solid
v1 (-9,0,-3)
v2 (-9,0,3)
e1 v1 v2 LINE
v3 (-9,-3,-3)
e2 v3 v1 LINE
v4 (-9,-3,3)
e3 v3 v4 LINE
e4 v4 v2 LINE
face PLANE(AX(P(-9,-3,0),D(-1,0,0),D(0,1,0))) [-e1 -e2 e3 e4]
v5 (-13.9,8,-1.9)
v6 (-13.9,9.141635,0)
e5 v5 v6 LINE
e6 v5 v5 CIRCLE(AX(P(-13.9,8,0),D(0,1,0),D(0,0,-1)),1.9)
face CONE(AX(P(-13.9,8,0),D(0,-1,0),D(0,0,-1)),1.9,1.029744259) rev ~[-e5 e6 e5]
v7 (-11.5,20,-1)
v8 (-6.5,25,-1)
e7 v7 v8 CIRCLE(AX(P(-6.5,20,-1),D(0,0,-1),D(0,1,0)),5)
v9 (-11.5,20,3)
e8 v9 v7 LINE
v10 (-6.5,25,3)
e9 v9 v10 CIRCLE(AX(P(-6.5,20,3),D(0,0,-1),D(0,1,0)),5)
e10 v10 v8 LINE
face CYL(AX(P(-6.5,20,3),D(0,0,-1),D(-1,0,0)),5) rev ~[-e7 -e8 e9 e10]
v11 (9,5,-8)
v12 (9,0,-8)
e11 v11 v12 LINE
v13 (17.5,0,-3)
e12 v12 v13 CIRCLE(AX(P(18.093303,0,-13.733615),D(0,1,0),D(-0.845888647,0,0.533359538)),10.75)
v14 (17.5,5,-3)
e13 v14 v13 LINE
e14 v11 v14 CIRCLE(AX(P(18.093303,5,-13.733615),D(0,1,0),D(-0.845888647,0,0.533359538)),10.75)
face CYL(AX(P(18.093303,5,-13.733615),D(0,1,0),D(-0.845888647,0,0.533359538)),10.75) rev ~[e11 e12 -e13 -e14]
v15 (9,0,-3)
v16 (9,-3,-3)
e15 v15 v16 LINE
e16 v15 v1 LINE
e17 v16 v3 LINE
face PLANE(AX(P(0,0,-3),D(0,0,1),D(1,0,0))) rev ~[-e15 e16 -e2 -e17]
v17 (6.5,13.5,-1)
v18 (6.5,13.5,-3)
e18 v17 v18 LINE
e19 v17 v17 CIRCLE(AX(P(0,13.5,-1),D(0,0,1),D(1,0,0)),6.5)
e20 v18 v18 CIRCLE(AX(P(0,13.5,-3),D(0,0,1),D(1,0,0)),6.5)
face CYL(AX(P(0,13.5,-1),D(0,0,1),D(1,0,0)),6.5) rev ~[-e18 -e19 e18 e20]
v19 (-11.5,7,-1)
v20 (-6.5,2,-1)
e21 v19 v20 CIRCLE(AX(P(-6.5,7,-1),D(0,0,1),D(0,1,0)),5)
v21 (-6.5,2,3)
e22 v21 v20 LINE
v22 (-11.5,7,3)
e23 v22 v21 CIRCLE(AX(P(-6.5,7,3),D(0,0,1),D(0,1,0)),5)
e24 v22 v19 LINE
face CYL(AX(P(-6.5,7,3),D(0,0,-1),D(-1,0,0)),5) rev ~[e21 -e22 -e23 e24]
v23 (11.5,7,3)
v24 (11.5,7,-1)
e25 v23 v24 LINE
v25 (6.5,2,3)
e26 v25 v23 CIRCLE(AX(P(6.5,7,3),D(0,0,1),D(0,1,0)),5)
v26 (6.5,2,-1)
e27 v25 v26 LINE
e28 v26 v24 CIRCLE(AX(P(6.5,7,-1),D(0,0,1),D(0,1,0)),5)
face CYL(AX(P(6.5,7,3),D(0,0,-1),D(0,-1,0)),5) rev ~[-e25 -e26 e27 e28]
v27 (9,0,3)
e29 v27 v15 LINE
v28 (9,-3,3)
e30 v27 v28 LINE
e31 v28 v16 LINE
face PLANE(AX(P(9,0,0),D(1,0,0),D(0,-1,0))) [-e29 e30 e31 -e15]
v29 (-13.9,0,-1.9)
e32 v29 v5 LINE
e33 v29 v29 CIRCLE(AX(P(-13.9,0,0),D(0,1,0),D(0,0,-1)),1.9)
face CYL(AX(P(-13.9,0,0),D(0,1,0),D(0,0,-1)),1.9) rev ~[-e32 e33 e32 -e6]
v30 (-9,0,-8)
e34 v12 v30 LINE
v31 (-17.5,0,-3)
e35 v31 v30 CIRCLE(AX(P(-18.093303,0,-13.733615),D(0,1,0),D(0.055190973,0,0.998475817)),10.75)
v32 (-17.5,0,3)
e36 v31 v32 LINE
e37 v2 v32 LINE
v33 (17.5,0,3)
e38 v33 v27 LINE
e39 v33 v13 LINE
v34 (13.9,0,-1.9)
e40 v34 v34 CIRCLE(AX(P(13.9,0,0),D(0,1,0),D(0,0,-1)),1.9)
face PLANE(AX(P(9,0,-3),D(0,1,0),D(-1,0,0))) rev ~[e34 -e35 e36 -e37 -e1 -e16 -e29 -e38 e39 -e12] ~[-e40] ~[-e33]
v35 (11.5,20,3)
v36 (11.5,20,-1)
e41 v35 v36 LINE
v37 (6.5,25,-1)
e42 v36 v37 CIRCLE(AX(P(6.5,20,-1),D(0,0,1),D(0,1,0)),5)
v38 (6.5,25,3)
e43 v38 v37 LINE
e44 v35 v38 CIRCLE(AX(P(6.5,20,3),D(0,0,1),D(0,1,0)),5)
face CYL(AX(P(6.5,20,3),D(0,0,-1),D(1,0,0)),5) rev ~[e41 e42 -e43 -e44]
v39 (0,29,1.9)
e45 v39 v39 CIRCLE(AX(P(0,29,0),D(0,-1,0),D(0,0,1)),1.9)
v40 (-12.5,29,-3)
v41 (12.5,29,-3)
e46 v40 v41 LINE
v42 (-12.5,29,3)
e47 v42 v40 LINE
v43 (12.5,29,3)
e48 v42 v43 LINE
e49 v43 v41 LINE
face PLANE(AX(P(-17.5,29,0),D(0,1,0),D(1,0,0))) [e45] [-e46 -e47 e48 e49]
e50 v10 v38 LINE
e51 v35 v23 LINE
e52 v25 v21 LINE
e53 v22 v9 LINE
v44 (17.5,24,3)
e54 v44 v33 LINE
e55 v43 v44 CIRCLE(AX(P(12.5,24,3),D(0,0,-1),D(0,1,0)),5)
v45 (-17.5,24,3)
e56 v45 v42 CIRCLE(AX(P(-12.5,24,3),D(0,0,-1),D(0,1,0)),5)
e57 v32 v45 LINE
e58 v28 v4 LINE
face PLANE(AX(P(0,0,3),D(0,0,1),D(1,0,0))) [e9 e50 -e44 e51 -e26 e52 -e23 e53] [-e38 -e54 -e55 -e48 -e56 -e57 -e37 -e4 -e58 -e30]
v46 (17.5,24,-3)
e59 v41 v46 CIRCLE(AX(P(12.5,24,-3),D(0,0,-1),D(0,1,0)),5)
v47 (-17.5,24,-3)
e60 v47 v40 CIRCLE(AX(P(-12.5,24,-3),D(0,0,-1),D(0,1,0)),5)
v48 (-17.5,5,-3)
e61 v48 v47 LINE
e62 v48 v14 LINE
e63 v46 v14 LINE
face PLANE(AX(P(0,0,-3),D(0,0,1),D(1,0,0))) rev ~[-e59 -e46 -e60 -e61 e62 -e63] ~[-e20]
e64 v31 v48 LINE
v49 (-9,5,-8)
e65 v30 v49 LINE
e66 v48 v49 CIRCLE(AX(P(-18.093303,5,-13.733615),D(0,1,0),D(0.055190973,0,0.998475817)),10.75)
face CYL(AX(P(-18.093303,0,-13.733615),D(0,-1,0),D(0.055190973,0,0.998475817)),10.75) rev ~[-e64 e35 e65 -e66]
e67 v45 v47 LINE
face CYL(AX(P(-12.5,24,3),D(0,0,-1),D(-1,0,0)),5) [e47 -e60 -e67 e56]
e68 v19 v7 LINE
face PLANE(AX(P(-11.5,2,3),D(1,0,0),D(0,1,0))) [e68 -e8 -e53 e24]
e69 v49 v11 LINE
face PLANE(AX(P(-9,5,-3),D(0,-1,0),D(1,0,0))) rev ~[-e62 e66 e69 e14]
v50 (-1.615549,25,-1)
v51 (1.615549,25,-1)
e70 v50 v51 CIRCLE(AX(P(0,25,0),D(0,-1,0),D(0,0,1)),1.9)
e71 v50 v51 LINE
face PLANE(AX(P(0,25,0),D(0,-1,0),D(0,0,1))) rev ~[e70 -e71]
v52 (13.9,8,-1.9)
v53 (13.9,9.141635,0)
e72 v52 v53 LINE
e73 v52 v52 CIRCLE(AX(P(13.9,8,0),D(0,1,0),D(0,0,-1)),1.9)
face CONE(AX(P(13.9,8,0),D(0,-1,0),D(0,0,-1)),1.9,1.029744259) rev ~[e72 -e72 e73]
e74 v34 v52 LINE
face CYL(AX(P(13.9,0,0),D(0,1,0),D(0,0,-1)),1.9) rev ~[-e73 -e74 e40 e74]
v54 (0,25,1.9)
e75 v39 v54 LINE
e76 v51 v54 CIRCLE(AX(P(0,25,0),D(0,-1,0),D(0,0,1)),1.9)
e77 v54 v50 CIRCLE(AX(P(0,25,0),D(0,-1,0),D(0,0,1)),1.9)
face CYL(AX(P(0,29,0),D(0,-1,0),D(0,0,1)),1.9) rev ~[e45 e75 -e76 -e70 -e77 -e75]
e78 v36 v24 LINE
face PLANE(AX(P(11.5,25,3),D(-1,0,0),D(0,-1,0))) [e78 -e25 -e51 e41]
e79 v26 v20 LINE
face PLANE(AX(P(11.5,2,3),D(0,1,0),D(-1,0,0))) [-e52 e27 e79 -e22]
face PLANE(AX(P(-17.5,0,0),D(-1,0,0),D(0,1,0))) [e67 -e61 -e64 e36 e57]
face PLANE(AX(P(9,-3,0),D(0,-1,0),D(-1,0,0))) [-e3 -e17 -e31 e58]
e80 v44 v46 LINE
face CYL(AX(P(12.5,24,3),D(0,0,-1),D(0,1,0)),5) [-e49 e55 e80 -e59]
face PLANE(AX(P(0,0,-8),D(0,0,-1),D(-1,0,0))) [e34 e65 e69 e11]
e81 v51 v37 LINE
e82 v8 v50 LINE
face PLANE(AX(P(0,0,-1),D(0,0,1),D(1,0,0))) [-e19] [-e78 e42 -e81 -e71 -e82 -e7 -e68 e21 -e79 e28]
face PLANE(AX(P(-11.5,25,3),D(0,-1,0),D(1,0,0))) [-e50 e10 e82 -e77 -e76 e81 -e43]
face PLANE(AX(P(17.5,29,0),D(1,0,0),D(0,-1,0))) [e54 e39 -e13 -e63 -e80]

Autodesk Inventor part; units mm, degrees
ref_plane "YZ-Ebene" through (0, 0, 0) normal (1, 0, 0) x (0, 1, 0)
ref_plane "XZ-Ebene" through (0, 0, 0) normal (0, 1, 0) x (-1, 0, 0)
ref_plane "XY-Ebene" through (0, 0, 0) normal (0, 0, 1) x (1, 0, 0)
sketch "Skizze1" plane through (0, 0, 0) normal (0, 0, 1) x (1, 0, 0)
  line L0 (-17.5, 0) -> (-17.5, 29)
  line L1 (-17.5, 29) -> (17.5, 29)
  line L2 (17.5, 29) -> (17.5, 0)
  line L3 (17.5, 0) -> (9, 0)
  line L4 (9, 0) -> (9, -3)
  line L5 (9, -3) -> (-9, -3)
  line L6 (-9, -3) -> (-9, 0)
  line L7 (-9, 0) -> (-17.5, 0)
  point P0 (0, 0)
  point P1 (0, -3)
  point P2 (0, 29)
  point P3 (13.25, 0)
  dimension "d0" = 18
  dimension "d1" = 35
  dimension "d2" = 29
  dimension "d3" = 3
extrude "Extrusion1" add sketch "Skizze1" along normal mid plane 6
sketch "Skizze2" plane through (0, 0, 3) normal (0, 0, 1) x (1, 0, 0)
  line L0 (-11.5, 25) -> (11.5, 25)
  line L1 (11.5, 25) -> (11.5, 2)
  line L2 (11.5, 2) -> (-11.5, 2)
  line L3 (-11.5, 2) -> (-11.5, 25)
  line L4 (-11.5, 25) -> (11.5, 2) construction
  line L5 (11.5, 25) -> (-11.5, 2) construction
  line L6 (-9, -3) -> (9, -3) projected
  point P0 (0, 0)
  point P1 (0, 13.5)
  point P2 (0, 2)
  dimension "d27" = 16.5
  dimension "d28" = 23
extrude "Extrusion2" cut sketch "Skizze2" against normal blind 4
fillet "Rundung1" radius 5 6 edges at (-17.5, 29, 0) (17.5, 29, 0) (-11.5, 25, 1) (11.5, 25, 1) (11.5, 2, 1) (-11.5, 2, 1)
sketch "Skizze3" plane through (0, 0, -1) normal (0, 0, 1) x (1, 0, 0)
  circle A0 centre (0, 13.5) radius 6.5
  line L0 (-9, -3) -> (9, -3) construction
  line L1 (9, -3) -> (-9, -3) construction
  point P0 (0, 0)
  dimension "d12" = 13
  dimension "d13" = 16.5
extrude "Extrusion3" cut sketch "Skizze3" against normal through all
sketch "Skizze4" plane through (9, 0, 3) normal (0, -1, 0) x (1, 0, 0)
  line L0 (-22.9, -3) -> (-9, -3) construction
  line L1 (-9, -3) -> (4.9, -3) construction
  dimension "d19" = 27.8
hole "Bohrung1" at (-13.9, 0, 0) at (13.9, 0, 0) direction (0, 1, 0) diameter 3.8 depth 8 tip angle 118
sketch "Skizze5" plane through (0, 0, -3) normal (0, 0, -1) x (-1, 0, 0)
  line L0 (-9, -3) -> (-9, 0) projected
  line L1 (-9, 0) -> (9, 0)
  line L2 (9, 0) -> (9, 5)
  line L3 (9, 5) -> (-9, 5)
  line L4 (-9, 5) -> (-9, 0)
  point P0 (0, 0)
  dimension "d29" = 5
extrude "Extrusion4" add sketch "Skizze5" along normal blind 5
fillet "Rundung2" radius 10.75 2 edges at (9, 2.5, -3) (-9, 2.5, -3)
sketch "Skizze6" plane through (-12.5, 29, -3) normal (0, 1, 0) x (1, 0, 0)
  point P0 (12.5, -3)
hole "Bohrung2" at (0, 29, 0) direction (0, -1, 0) diameter 3.8 depth 4
properties part number "Endcap" material "ABS-Kunststoff"
